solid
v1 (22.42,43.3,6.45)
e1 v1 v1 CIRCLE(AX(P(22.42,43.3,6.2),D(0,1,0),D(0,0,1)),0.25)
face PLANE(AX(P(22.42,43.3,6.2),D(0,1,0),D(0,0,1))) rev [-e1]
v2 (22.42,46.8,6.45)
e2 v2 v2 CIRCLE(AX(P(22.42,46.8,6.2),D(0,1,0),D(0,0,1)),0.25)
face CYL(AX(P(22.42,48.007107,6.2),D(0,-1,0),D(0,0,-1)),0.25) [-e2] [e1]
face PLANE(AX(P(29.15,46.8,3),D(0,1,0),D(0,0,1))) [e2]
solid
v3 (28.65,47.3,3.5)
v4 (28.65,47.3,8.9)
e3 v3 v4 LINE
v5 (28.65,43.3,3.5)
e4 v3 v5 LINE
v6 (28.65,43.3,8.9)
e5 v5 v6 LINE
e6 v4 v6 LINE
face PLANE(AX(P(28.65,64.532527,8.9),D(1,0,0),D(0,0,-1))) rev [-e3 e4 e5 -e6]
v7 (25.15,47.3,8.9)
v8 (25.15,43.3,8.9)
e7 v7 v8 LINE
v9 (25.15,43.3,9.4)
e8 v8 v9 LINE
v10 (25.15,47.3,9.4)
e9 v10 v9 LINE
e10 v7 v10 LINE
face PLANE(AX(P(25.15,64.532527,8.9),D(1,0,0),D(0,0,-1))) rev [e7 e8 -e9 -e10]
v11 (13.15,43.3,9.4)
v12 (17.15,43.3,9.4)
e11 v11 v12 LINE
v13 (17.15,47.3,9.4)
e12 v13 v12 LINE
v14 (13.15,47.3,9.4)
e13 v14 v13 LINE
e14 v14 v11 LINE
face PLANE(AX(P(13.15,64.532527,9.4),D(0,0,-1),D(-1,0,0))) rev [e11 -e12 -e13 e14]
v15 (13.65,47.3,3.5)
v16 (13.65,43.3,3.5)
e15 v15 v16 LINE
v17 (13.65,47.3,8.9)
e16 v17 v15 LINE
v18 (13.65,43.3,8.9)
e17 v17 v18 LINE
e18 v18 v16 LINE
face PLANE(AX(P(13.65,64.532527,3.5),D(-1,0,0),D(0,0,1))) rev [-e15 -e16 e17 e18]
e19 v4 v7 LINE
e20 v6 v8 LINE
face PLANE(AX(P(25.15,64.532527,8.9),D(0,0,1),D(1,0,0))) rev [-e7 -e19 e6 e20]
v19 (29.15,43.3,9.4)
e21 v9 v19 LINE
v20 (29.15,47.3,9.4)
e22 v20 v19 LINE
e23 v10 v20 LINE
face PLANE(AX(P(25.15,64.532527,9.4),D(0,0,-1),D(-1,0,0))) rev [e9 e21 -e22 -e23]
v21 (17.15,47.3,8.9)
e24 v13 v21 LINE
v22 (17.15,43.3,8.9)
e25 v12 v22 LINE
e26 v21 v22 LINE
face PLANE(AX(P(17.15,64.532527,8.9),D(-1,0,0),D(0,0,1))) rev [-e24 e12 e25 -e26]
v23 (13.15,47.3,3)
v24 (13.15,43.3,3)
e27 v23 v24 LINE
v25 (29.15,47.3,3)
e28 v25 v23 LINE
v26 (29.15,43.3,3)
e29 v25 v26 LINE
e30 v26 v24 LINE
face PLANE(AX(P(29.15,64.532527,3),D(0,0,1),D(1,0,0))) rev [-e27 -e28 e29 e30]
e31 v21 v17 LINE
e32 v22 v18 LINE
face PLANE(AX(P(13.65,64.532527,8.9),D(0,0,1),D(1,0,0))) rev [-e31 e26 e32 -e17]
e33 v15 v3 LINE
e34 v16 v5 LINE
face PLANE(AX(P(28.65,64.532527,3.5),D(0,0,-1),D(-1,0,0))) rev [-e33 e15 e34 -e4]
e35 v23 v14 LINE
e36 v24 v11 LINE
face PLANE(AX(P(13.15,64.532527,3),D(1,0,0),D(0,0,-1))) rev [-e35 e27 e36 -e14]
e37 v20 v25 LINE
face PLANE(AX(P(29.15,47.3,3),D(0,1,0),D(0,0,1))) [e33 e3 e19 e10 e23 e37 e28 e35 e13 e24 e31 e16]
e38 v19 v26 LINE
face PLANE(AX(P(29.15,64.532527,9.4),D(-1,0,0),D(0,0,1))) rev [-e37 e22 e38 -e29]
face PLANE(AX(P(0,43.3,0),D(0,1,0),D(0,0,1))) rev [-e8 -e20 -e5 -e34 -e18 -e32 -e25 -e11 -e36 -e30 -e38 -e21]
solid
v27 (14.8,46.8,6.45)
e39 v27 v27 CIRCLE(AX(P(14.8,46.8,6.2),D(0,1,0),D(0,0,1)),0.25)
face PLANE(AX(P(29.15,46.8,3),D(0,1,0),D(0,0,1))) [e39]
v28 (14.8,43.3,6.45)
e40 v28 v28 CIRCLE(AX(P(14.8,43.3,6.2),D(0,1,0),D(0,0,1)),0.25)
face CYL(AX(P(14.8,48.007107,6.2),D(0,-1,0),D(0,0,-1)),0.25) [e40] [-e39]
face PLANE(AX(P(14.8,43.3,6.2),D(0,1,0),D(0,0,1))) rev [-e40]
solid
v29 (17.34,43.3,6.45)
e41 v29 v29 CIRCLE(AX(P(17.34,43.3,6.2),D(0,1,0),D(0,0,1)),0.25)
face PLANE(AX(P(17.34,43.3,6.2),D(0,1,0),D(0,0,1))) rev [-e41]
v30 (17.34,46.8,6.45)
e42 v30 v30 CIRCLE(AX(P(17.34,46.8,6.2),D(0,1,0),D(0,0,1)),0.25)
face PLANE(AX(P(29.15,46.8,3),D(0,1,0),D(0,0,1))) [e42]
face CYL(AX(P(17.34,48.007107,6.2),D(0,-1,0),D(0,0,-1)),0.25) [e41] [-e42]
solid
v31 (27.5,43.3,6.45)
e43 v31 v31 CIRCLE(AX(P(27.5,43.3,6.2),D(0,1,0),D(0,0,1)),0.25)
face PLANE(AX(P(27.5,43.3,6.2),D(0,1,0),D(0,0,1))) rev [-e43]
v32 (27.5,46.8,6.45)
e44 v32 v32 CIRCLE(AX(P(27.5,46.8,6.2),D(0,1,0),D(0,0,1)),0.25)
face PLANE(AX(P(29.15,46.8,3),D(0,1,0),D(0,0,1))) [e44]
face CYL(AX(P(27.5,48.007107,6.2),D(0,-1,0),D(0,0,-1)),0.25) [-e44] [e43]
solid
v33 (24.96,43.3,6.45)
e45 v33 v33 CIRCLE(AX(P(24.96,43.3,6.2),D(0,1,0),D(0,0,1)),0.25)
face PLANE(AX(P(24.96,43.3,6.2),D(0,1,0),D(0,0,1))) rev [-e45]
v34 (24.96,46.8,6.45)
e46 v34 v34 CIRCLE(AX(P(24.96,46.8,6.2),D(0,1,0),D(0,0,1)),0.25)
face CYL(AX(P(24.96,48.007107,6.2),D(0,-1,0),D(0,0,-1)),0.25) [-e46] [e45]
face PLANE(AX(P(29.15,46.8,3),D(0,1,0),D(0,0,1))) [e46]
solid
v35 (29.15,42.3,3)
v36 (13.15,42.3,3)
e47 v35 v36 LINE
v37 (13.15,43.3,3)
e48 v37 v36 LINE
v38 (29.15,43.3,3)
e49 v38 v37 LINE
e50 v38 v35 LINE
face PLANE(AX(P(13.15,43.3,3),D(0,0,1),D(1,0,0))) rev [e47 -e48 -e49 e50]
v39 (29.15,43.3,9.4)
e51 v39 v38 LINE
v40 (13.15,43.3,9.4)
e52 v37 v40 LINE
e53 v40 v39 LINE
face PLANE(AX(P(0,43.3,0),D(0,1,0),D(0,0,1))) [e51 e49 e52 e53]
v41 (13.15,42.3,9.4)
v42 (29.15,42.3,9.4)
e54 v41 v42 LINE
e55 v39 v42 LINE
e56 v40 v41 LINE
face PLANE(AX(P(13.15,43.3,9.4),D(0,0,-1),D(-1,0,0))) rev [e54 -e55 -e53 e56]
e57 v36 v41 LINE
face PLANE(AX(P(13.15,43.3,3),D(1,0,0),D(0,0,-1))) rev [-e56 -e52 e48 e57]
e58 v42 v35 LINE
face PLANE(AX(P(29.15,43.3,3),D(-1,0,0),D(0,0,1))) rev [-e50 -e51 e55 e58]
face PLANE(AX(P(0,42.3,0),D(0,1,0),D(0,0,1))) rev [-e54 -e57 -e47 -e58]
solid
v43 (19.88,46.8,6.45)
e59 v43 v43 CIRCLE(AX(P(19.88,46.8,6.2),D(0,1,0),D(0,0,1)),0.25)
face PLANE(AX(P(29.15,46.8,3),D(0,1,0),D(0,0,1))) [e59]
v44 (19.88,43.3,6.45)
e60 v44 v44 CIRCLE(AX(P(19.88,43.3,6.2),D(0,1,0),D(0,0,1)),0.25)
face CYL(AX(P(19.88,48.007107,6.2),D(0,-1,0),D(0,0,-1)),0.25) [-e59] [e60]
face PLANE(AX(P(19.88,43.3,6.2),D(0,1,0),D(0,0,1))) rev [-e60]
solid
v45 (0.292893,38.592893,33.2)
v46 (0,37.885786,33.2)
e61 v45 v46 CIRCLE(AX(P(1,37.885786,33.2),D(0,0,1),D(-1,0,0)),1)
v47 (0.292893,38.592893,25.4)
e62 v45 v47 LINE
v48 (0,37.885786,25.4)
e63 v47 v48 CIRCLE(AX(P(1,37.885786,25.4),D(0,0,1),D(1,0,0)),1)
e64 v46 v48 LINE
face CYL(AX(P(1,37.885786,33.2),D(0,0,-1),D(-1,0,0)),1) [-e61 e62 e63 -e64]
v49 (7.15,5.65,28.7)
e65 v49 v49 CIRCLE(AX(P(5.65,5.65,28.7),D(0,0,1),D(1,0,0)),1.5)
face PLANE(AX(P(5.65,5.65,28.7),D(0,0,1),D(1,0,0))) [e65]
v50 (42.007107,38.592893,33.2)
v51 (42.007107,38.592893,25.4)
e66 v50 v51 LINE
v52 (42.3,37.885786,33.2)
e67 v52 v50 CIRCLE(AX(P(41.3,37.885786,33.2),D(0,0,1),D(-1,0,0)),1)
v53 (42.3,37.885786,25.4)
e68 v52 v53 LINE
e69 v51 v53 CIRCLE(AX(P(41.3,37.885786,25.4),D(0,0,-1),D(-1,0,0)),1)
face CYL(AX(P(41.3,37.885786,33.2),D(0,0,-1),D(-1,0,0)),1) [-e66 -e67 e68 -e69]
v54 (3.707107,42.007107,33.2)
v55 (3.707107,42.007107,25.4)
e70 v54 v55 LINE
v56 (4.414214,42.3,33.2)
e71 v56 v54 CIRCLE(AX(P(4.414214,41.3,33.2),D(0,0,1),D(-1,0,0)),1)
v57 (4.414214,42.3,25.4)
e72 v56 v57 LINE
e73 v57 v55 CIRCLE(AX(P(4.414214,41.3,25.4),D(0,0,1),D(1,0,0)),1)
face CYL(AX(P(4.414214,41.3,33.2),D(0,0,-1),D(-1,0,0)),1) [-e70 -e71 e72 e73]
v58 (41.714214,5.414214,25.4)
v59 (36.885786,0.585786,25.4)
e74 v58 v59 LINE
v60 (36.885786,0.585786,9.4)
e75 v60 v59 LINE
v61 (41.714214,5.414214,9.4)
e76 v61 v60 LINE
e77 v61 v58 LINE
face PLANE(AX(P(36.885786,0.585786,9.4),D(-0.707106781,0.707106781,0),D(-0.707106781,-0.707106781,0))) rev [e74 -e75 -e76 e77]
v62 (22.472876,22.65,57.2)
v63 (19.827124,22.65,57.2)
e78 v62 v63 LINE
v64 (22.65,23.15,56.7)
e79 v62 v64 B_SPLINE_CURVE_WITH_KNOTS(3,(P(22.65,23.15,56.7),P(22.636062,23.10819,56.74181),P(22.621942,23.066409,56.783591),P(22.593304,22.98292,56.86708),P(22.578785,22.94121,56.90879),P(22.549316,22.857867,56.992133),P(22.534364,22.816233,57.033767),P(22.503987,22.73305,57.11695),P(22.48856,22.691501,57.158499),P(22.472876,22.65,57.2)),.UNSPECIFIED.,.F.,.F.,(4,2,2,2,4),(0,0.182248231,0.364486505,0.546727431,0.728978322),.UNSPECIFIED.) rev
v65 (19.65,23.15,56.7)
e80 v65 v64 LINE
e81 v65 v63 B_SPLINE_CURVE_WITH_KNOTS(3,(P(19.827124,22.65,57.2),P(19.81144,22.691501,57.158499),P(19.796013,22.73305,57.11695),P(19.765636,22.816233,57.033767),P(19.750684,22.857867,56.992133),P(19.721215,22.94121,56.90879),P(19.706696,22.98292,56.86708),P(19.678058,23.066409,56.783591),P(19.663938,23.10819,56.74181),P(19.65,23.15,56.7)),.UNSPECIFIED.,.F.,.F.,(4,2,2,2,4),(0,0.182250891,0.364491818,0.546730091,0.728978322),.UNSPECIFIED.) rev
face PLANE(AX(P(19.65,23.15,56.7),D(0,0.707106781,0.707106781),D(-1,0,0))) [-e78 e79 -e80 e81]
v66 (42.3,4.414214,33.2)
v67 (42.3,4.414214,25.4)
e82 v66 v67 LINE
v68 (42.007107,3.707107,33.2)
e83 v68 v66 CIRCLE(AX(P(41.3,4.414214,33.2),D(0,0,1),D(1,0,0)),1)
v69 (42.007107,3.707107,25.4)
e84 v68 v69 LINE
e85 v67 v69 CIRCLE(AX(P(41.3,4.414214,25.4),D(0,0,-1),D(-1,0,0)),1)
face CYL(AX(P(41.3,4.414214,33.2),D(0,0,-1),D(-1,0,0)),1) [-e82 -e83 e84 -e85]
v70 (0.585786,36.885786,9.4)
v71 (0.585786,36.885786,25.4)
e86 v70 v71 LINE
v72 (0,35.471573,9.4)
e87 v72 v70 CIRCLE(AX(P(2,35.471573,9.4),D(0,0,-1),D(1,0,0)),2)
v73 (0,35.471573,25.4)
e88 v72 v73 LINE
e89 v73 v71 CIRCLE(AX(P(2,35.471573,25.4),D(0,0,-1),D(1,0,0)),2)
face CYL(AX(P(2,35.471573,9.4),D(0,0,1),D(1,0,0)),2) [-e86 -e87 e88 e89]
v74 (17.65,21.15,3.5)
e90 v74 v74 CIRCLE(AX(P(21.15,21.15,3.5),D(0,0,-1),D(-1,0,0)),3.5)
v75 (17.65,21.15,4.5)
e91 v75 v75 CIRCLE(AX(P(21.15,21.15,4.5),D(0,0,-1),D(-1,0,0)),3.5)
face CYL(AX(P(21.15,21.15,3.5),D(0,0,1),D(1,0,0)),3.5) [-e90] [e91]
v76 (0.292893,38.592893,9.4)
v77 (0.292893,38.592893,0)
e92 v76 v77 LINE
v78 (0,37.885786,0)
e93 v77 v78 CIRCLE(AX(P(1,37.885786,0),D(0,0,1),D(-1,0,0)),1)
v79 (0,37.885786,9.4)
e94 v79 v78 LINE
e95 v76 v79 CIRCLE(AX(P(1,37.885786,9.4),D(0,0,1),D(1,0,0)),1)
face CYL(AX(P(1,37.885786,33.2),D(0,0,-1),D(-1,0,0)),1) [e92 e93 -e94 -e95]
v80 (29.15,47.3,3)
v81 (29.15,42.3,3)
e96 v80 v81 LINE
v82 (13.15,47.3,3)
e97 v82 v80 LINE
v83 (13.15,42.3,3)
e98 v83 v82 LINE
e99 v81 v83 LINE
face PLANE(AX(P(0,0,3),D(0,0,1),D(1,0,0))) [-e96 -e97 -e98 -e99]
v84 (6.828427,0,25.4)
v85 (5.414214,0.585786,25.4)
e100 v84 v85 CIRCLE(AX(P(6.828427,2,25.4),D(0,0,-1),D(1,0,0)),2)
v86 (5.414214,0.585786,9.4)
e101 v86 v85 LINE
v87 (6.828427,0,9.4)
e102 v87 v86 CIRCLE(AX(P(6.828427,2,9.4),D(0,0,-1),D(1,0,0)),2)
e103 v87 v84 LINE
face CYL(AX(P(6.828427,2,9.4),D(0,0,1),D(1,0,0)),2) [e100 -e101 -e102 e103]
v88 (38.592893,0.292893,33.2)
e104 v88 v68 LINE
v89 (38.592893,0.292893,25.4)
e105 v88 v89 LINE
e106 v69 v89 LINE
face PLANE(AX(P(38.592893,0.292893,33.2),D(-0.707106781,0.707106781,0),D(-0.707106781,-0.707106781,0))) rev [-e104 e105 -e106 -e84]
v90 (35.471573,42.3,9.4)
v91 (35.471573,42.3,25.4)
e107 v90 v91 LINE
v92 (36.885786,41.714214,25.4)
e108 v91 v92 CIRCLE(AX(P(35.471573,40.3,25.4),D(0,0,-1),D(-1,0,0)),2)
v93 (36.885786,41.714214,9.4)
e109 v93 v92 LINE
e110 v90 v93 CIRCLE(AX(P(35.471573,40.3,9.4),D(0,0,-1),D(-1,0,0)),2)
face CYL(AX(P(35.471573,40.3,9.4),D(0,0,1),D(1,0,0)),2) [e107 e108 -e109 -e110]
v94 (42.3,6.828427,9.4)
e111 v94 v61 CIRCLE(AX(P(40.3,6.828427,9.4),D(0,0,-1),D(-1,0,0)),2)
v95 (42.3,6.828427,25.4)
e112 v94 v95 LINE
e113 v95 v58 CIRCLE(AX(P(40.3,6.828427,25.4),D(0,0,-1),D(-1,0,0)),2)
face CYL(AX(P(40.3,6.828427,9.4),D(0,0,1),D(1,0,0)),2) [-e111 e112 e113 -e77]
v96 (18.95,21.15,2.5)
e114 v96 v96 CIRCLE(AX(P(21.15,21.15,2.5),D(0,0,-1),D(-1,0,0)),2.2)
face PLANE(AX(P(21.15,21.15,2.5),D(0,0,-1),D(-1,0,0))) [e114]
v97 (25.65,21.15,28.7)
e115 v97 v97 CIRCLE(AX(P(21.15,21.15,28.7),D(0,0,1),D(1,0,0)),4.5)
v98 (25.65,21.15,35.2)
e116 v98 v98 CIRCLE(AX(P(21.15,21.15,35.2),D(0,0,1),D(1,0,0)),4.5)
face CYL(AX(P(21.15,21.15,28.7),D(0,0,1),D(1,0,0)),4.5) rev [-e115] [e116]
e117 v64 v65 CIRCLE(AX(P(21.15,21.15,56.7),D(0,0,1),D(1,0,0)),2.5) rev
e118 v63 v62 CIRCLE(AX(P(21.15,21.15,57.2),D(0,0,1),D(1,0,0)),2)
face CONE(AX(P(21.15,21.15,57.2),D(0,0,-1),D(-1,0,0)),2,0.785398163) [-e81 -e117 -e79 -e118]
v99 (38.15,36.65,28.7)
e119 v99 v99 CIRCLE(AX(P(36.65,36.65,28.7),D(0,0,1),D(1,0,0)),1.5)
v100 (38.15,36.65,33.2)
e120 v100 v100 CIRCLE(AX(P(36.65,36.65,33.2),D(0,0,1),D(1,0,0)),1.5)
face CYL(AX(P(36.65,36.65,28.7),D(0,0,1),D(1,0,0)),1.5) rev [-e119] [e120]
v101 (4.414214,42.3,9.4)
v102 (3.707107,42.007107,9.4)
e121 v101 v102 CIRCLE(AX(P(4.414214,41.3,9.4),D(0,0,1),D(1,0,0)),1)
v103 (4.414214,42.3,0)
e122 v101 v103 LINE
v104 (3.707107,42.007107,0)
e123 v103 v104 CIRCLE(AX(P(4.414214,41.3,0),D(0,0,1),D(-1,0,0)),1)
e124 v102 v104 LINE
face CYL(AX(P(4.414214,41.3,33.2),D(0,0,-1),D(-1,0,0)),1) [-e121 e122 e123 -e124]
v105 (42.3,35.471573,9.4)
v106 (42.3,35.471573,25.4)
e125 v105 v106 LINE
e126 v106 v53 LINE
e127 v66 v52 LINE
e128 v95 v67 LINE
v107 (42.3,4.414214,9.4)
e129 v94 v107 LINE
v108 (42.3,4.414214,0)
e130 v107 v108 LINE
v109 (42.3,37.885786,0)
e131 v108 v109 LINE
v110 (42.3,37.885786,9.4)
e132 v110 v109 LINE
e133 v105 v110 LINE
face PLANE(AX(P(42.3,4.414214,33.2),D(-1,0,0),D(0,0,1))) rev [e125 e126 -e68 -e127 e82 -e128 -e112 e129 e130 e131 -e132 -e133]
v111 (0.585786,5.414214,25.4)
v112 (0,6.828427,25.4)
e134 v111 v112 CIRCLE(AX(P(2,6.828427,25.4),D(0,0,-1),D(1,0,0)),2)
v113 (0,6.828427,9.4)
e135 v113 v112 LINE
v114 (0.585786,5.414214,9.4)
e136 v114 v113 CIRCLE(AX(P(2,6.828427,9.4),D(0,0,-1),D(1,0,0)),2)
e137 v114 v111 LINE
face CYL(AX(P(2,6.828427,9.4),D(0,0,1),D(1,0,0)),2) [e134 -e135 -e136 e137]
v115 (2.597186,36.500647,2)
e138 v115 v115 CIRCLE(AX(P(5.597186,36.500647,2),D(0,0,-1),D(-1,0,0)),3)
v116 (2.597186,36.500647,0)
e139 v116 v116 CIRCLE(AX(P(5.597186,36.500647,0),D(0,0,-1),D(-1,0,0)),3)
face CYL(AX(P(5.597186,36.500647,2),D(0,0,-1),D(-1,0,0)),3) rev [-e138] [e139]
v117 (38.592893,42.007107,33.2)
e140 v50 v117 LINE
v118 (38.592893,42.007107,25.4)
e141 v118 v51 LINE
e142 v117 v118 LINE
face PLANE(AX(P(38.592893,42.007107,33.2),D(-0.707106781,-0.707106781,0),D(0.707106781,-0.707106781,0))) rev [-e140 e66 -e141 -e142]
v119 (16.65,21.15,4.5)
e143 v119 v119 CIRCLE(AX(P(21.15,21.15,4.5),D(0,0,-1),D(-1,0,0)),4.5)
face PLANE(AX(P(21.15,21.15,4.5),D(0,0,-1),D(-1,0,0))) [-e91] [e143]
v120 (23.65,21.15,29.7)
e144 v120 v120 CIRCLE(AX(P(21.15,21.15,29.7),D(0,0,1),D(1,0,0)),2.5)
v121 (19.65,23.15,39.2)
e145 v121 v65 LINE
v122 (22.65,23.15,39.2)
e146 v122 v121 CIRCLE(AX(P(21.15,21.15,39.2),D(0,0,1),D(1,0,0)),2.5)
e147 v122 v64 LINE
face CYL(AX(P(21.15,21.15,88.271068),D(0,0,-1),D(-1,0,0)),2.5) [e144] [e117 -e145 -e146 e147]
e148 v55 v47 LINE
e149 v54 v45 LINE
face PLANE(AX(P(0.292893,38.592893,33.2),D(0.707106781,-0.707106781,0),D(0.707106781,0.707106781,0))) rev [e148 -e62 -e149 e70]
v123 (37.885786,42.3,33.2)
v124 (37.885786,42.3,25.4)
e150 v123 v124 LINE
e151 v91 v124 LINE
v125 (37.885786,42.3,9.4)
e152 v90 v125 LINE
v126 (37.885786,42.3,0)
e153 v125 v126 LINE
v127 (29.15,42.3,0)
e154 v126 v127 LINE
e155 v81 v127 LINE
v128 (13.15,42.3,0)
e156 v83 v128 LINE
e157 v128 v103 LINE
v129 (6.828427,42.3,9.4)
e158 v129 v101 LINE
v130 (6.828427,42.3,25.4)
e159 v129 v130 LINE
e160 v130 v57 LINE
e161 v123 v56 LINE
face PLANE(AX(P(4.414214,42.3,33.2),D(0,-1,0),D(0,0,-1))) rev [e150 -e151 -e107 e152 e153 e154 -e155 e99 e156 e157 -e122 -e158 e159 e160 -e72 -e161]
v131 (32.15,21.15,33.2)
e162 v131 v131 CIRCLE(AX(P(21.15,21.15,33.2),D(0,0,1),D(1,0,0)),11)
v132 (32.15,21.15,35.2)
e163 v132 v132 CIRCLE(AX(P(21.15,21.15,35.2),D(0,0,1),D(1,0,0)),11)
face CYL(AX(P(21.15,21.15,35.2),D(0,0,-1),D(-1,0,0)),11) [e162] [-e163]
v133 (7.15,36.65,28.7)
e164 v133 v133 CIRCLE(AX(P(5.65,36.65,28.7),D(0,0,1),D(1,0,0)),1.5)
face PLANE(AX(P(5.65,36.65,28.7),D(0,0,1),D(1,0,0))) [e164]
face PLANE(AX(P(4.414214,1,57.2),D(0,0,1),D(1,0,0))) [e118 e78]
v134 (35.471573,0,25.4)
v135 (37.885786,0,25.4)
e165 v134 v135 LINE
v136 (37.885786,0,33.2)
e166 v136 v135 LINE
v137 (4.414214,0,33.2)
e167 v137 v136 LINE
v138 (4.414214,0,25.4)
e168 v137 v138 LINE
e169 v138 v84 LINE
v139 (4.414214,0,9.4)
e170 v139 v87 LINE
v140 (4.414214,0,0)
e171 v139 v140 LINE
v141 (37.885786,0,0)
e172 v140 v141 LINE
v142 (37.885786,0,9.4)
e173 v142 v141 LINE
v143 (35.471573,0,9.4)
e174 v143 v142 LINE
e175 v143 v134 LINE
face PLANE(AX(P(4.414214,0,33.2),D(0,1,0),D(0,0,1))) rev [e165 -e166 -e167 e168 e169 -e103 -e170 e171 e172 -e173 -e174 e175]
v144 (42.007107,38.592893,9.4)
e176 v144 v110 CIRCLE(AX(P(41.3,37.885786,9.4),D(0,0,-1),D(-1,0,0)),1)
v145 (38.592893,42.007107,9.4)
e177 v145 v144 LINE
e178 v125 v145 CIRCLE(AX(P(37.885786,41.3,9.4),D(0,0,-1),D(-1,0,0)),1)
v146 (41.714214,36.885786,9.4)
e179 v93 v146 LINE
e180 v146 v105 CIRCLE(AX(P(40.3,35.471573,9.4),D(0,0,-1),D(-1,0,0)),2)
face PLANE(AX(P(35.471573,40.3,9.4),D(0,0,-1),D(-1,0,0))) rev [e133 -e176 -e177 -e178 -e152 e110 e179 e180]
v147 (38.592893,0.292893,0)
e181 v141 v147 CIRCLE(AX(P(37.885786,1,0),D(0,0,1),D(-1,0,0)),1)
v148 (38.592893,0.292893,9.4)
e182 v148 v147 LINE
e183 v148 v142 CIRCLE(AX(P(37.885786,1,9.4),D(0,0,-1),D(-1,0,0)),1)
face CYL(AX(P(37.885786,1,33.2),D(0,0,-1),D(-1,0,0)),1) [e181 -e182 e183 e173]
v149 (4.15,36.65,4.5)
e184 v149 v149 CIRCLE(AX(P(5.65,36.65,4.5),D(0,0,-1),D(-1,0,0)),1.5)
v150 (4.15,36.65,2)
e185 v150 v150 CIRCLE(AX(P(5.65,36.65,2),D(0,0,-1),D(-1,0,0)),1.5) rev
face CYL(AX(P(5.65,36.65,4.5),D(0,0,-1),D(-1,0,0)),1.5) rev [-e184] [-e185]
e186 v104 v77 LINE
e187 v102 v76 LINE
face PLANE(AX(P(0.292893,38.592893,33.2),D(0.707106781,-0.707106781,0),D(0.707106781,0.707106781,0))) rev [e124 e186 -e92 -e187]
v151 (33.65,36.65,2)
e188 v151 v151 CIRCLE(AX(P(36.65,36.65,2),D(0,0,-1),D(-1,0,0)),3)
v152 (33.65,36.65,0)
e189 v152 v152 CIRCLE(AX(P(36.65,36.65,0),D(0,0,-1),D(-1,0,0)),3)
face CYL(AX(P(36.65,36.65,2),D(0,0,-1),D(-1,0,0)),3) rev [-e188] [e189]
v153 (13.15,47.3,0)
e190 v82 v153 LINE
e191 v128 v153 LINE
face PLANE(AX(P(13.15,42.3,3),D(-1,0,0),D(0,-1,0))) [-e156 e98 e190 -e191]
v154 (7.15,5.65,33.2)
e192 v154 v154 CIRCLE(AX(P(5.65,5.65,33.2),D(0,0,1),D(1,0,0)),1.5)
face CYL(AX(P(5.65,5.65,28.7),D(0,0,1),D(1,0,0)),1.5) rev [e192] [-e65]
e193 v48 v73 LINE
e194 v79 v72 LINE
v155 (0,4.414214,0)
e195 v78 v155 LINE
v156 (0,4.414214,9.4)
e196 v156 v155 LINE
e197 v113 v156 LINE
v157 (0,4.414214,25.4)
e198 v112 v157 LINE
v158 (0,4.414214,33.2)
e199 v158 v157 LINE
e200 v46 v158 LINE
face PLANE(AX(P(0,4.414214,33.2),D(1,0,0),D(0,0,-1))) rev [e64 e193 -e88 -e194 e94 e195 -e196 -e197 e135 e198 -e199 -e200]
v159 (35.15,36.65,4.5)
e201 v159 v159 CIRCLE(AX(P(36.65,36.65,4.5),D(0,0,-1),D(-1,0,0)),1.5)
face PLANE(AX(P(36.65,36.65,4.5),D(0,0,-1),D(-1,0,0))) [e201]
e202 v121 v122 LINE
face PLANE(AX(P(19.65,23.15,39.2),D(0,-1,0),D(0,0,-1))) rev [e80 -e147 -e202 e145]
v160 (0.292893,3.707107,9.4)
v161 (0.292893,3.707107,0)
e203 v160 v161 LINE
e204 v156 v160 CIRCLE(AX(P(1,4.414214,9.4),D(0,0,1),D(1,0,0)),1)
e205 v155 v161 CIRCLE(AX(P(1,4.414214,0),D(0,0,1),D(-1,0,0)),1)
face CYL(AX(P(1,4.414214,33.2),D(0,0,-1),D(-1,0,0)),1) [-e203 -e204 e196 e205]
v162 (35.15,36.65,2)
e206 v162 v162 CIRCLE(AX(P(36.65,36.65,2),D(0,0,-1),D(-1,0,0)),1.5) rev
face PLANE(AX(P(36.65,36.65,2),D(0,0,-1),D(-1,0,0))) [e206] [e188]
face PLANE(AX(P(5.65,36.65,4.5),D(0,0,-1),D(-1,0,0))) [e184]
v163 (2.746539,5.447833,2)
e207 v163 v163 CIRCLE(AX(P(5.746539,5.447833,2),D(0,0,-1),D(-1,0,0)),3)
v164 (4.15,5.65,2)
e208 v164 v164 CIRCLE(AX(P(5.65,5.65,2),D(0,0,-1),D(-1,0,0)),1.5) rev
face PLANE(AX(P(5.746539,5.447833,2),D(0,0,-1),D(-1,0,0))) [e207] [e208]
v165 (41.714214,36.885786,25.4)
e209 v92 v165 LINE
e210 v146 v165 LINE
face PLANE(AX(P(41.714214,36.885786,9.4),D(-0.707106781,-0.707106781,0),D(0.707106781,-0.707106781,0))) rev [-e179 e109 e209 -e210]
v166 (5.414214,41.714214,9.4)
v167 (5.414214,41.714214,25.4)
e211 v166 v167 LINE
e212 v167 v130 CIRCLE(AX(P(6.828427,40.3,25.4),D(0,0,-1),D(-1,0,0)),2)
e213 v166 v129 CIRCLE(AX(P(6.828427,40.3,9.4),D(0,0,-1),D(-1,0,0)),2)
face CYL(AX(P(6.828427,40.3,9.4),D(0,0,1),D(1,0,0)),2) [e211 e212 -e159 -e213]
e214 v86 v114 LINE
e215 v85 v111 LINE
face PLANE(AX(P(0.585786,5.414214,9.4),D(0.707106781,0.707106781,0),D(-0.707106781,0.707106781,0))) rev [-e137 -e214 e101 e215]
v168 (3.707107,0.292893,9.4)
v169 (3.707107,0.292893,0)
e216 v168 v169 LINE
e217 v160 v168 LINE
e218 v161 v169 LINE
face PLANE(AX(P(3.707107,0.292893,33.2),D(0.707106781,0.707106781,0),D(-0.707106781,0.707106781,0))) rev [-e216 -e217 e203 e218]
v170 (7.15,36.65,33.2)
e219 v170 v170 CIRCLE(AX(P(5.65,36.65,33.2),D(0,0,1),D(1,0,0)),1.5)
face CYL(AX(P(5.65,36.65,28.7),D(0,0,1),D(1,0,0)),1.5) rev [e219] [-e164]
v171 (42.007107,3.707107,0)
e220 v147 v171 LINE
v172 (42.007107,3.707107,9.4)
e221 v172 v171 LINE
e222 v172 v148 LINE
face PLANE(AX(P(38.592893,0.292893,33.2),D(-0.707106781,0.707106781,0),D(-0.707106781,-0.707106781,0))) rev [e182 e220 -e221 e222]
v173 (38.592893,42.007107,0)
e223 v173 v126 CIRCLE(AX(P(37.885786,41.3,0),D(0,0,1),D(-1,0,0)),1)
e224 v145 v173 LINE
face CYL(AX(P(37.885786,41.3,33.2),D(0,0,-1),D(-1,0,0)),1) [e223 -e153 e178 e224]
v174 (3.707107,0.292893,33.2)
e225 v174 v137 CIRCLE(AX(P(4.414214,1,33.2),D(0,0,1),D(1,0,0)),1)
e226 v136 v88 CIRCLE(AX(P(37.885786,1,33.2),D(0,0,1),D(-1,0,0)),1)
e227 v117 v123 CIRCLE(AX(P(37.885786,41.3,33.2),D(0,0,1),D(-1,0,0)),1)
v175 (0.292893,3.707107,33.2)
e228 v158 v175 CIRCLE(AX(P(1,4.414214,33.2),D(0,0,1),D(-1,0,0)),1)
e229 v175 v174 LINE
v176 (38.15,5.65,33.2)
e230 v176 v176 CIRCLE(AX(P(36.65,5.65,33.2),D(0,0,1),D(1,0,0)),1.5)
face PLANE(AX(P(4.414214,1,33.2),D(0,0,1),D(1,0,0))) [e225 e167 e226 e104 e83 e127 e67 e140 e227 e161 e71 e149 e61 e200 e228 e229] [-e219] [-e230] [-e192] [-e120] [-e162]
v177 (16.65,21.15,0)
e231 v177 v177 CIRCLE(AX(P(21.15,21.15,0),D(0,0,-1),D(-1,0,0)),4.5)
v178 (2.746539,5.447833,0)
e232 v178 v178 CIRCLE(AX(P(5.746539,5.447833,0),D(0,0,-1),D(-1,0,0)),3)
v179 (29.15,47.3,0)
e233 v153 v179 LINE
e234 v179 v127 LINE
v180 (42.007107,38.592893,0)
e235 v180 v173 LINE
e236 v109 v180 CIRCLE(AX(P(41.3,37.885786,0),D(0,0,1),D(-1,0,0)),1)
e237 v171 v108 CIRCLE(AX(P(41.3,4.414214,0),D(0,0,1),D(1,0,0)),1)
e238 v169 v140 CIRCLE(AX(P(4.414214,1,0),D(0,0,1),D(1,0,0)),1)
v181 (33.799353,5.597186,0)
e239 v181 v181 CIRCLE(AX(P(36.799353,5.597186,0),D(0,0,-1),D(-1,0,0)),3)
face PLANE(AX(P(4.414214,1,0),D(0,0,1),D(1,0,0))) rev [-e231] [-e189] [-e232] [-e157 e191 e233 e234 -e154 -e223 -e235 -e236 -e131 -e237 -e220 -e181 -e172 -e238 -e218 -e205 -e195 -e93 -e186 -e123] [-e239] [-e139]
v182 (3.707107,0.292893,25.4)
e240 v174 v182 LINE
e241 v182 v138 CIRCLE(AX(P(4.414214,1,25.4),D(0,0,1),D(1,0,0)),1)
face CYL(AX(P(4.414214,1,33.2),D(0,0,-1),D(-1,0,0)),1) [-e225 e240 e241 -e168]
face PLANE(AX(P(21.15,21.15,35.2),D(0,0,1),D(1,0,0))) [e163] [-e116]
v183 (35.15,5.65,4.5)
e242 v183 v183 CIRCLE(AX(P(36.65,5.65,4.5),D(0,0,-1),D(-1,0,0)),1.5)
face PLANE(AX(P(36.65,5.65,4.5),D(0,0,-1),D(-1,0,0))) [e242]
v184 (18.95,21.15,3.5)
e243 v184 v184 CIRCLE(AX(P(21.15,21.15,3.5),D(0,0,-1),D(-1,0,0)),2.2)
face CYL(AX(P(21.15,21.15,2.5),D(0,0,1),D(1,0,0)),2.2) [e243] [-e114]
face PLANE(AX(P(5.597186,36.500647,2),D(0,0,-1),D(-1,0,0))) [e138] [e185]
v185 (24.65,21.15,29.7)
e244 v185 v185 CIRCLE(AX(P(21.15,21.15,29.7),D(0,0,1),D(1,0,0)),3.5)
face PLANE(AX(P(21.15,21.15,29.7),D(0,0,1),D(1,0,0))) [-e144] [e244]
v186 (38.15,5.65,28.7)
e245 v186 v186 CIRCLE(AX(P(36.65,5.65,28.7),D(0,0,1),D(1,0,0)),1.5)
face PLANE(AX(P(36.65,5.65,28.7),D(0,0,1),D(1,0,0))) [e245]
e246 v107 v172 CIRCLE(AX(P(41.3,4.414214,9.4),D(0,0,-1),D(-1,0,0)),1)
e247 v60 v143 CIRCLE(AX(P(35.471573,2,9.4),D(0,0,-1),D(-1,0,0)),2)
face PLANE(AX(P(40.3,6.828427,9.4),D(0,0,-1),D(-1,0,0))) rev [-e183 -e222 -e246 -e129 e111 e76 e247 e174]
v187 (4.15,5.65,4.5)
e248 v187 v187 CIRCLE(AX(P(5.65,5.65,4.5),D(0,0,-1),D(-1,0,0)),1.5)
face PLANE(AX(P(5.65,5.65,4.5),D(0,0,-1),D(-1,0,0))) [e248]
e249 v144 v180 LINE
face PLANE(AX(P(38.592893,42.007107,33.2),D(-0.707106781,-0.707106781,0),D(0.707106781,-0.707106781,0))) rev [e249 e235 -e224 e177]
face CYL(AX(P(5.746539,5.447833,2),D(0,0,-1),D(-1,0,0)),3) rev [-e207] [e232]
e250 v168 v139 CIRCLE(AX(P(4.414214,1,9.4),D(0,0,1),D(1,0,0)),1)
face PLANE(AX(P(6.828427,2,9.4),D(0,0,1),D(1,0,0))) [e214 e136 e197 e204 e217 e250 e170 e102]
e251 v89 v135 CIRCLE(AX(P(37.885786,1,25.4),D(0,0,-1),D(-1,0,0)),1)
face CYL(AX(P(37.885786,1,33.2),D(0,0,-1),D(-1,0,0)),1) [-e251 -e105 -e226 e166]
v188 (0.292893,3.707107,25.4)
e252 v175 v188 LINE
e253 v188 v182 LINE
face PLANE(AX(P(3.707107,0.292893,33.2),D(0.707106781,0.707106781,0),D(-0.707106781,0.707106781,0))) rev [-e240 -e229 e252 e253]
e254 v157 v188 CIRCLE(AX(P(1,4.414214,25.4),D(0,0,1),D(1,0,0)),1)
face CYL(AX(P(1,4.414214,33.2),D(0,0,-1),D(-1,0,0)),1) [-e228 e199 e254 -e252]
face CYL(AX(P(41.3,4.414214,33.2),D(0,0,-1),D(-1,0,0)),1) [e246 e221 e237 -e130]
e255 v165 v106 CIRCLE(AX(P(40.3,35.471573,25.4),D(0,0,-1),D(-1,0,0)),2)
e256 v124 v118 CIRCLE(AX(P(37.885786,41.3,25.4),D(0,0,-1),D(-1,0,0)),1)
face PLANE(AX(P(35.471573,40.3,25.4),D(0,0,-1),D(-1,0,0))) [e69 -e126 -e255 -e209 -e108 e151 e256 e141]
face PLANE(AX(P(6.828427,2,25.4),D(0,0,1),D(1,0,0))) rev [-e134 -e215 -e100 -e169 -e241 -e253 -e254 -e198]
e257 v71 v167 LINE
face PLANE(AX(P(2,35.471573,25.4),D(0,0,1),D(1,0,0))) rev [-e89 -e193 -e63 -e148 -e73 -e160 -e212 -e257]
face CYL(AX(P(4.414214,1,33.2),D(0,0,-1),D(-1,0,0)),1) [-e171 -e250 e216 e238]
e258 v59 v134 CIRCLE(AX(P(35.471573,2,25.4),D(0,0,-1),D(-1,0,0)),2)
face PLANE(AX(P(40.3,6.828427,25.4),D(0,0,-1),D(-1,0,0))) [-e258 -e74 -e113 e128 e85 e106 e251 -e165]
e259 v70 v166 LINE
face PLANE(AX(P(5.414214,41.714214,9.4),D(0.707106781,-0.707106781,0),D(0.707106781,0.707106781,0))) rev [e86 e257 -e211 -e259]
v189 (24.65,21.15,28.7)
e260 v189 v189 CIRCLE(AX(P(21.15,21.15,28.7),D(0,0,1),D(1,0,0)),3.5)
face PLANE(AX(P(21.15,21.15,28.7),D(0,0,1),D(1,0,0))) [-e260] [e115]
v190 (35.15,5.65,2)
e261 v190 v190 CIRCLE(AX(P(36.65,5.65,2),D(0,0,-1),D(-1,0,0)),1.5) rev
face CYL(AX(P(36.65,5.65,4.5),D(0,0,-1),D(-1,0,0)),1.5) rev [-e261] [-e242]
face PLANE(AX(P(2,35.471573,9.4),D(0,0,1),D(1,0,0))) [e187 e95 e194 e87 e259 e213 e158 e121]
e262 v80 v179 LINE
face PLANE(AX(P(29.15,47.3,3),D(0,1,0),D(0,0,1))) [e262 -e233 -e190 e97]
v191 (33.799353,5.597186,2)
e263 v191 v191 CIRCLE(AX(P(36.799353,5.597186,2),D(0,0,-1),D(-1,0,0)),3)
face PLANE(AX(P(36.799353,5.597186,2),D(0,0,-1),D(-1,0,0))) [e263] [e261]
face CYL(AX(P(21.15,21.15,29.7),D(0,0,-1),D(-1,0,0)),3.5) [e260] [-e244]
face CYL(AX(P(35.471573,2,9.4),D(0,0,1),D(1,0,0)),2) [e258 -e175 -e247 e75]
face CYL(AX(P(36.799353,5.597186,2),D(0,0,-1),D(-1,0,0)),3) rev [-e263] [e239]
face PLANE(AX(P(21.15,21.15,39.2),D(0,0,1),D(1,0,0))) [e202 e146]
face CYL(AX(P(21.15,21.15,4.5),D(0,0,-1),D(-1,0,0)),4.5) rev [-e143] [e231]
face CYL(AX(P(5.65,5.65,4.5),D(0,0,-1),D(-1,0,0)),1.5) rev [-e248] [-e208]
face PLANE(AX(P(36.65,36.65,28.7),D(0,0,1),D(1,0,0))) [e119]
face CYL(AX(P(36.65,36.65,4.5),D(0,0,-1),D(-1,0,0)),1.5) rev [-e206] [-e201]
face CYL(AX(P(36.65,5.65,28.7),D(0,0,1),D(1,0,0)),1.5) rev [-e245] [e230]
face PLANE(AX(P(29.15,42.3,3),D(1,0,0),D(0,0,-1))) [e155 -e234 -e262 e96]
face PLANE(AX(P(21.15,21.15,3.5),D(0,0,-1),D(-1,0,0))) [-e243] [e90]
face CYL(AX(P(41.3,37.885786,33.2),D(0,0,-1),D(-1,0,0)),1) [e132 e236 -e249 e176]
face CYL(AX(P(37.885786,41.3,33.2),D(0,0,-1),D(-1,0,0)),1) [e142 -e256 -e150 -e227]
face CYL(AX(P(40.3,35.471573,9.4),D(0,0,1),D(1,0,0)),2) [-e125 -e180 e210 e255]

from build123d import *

# Parameters (mm, degrees)
EXTRUDE_1_DEPTH     = 33.2
CUT_EXTRUDE_1_DEPTH = 16
SKETCH_4_W          = 16
SKETCH_4_H          = 5
EXTRUDE_2_DEPTH     = 3
SKETCH_5_R          = 1.5
SKETCH_5_R_2        = 4.5
CUT_EXTRUDE_2_DEPTH = 4.5
SKETCH_6_R          = 2.2
EXTRUDE_3_DEPTH     = 2
SKETCH_7_R          = 3
CUT_EXTRUDE_3_DEPTH = 2
CUT_EXTRUDE_START   = -4.5
SKETCH_8_R          = 1.5
SKETCH_8_R_2        = 4.5
CUT_EXTRUDE_4_DEPTH = 4.5
SKETCH_9_R          = 2.5
EXTRUDE_4_DEPTH     = 28.5
CUT_EXTRUDE_START_2 = -18
CUT_EXTRUDE_5_DEPTH = 18
CHAMFER_1_SIZE      = 0.5
SKETCH_11_R         = 11
SKETCH_11_R_2       = 4.5
EXTRUDE_5_DEPTH     = 2
SKETCH_12_R         = 3.5
EXTRUDE_6_DEPTH     = 1
EXTRUDE_START       = 1
SKETCH_13_R         = 3.5
EXTRUDE_7_DEPTH     = 1
SKETCH_14_W         = 16
SKETCH_14_H         = 6.4
EXTRUDE_8_DEPTH     = 1
SKETCH_15_R         = 0.25
EXTRUDE_9_DEPTH     = 3.5
EXTRUDE_9_2_DEPTH   = 3.5
EXTRUDE_9_3_DEPTH   = 3.5
EXTRUDE_9_4_DEPTH   = 3.5
EXTRUDE_9_5_DEPTH   = 3.5
EXTRUDE_9_6_DEPTH   = 3.5
EXTRUDE_10_DEPTH    = 4


with BuildPart() as part:
    # 草图1 → 凸台-拉伸1 (new body)
    with BuildSketch(Plane.XY):
        with BuildLine():
            Line((0.292893219, 38.592893219), (3.707106781, 42.007106781))
            ThreePointArc((3.707106781, 42.007106781), (4.03153013, 42.223879533), (4.414213562, 42.3))
            Line((4.414213562, 42.3), (37.885786438, 42.3))
            ThreePointArc((37.885786438, 42.3), (38.26846987, 42.223879533), (38.592893219, 42.007106781))
            Line((38.592893219, 42.007106781), (42.007106781, 38.592893219))
            ThreePointArc((42.007106781, 38.592893219), (42.223879533, 38.26846987), (42.3, 37.885786438))
            Line((42.3, 37.885786438), (42.3, 4.414213562))
            ThreePointArc((42.3, 4.414213562), (42.223879533, 4.03153013), (42.007106781, 3.707106781))
            Line((42.007106781, 3.707106781), (38.592893219, 0.292893219))
            ThreePointArc((38.592893219, 0.292893219), (38.26846987, 0.076120467), (37.885786438, 0))
            Line((37.885786438, 0), (4.414213562, 0))
            ThreePointArc((4.414213562, 0), (4.03153013, 0.076120467), (3.707106781, 0.292893219))
            Line((3.707106781, 0.292893219), (0.292893219, 3.707106781))
            ThreePointArc((0.292893219, 3.707106781), (0.076120467, 4.03153013), (0, 4.414213562))
            Line((0, 4.414213562), (0, 37.885786438))
            ThreePointArc((0, 37.885786438), (0.076120467, 38.26846987), (0.292893219, 38.592893219))
        make_face()
    extrude(amount=EXTRUDE_1_DEPTH)

    # 草图3 → 切除-拉伸1 (cut)
    with BuildSketch(Plane.XY.offset(25.4)):
        with BuildLine():
            Line((5.414213562, 41.714213562), (0.585786438, 36.885786438))
            ThreePointArc((0.585786438, 36.885786438), (0.152240935, 36.23693974), (0, 35.471572875))
            Line((0, 35.471572875), (0, 42.3))
            Line((0, 42.3), (6.828427125, 42.3))
            ThreePointArc((6.828427125, 42.3), (6.06306026, 42.147759065), (5.414213562, 41.714213562))
        make_face()
        with BuildLine():
            Line((0.585786438, 5.414213562), (5.414213562, 0.585786438))
            ThreePointArc((5.414213562, 0.585786438), (6.06306026, 0.152240935), (6.828427125, 0))
            Line((6.828427125, 0), (0, 0))
            Line((0, 0), (0, 6.828427125))
            ThreePointArc((0, 6.828427125), (0.152240935, 6.06306026), (0.585786438, 5.414213562))
        make_face()
        with BuildLine():
            Line((36.885786438, 0.585786438), (41.714213562, 5.414213562))
            ThreePointArc((41.714213562, 5.414213562), (42.147759065, 6.06306026), (42.3, 6.828427125))
            Line((42.3, 6.828427125), (42.3, 0))
            Line((42.3, 0), (35.471572875, 0))
            ThreePointArc((35.471572875, 0), (36.23693974, 0.152240935), (36.885786438, 0.585786438))
        make_face()
        with BuildLine():
            Line((41.714213562, 36.885786438), (36.885786438, 41.714213562))
            ThreePointArc((36.885786438, 41.714213562), (36.23693974, 42.147759065), (35.471572875, 42.3))
            Line((35.471572875, 42.3), (42.3, 42.3))
            Line((42.3, 42.3), (42.3, 35.471572875))
            ThreePointArc((42.3, 35.471572875), (42.147759065, 36.23693974), (41.714213562, 36.885786438))
        make_face()
    extrude(amount=-CUT_EXTRUDE_1_DEPTH, mode=Mode.SUBTRACT)

    # 草图4 → 凸台-拉伸2 (add)
    with BuildSketch(Plane(origin=(0, 0, 0), x_dir=(-1, 0, 0), z_dir=(0, 0, -1))):
        with Locations((-21.15, 44.8)):
            Rectangle(SKETCH_4_W, SKETCH_4_H)
    extrude(amount=-EXTRUDE_2_DEPTH)

    # 草图5 → 切除-拉伸2 (cut)
    with BuildSketch(Plane(origin=(0, 0, 0), x_dir=(-1, 0, 0), z_dir=(0, 0, -1))):
        with Locations((-36.65, 36.65)):
            Circle(SKETCH_5_R)
        with Locations((-5.65, 36.65)):
            Circle(SKETCH_5_R)
        with Locations((-5.65, 5.65)):
            Circle(SKETCH_5_R)
        with Locations((-36.65, 5.65)):
            Circle(SKETCH_5_R)
        with Locations((-21.15, 21.15)):
            Circle(SKETCH_5_R_2)
    extrude(amount=-CUT_EXTRUDE_2_DEPTH, mode=Mode.SUBTRACT)

    # 草图6 → 凸台-拉伸3 (add)
    with BuildSketch(Plane(origin=(0, 0, 4.5), x_dir=(-1, 0, 0), z_dir=(0, 0, -1))):
        with Locations((-21.15, 21.15)):
            Circle(SKETCH_6_R)
    extrude(amount=EXTRUDE_3_DEPTH)

    # 草图7 → 切除-拉伸3 (cut)
    with BuildSketch(Plane(origin=(0, 0, 0), x_dir=(-1, 0, 0), z_dir=(0, 0, -1))):
        with Locations((-36.65, 36.65)):
            Circle(SKETCH_7_R)
        with Locations((-5.597185915, 36.500646673)):
            Circle(SKETCH_7_R)
        with Locations((-5.746539242, 5.447832589)):
            Circle(SKETCH_7_R)
        with Locations((-36.799353327, 5.597185915)):
            Circle(SKETCH_7_R)
    extrude(amount=-CUT_EXTRUDE_3_DEPTH, mode=Mode.SUBTRACT)

    # 草图8 → 切除-拉伸4 (cut)
    with BuildSketch(Plane.XY.offset(33.2).offset(CUT_EXTRUDE_START)):
        with Locations(Location((5.65, 5.65, 0), (0, 0, 180))):
            Circle(SKETCH_8_R)
        with Locations(Location((36.65, 5.65, 0), (0, 0, 180))):
            Circle(SKETCH_8_R)
        with Locations(Location((36.65, 36.65, 0), (0, 0, 180))):
            Circle(SKETCH_8_R)
        with Locations(Location((5.65, 36.65, 0), (0, 0, 180))):
            Circle(SKETCH_8_R)
        with Locations(Location((21.15, 21.15, 0), (0, 0, 180))):
            Circle(SKETCH_8_R_2)
    extrude(amount=CUT_EXTRUDE_4_DEPTH, mode=Mode.SUBTRACT)

    # 草图9 → 凸台-拉伸4 (add)
    with BuildSketch(Plane.XY.offset(28.7)):
        with Locations(Location((21.15, 21.15, 0), (0, 0, 180))):
            Circle(SKETCH_9_R)
    extrude(amount=EXTRUDE_4_DEPTH)

    # 草图10 → 切除-拉伸5 (cut)
    with BuildSketch(Plane.XY.offset(57.2).offset(CUT_EXTRUDE_START_2)):
        with BuildLine():
            Line((19.65, 23.15), (22.65, 23.15))
            ThreePointArc((22.65, 23.15), (21.15, 23.65), (19.65, 23.15))
        make_face()
    extrude(amount=CUT_EXTRUDE_5_DEPTH, mode=Mode.SUBTRACT)

    # 倒角1
    chamfer_1_edges = [part.edges().sort_by_distance(p)[0] for p in [
        (22.268033989, 18.913932023, 57.2),
        (21.15, 23.15, 57.2),
    ]]
    chamfer(chamfer_1_edges, length=CHAMFER_1_SIZE - 0.0001)  # a hair under: the kernel refuses the full size

    # 草图11 → 凸台-拉伸5 (add)
    with BuildSketch(Plane.XY.offset(33.2)):
        with Locations((21.15, 21.15)):
            Circle(SKETCH_11_R)
        with Locations(Location((21.15, 21.15, 0), (0, 0, 180))):
            Circle(SKETCH_11_R_2, mode=Mode.SUBTRACT)
    extrude(amount=EXTRUDE_5_DEPTH)

    # 草图12 → 凸台-拉伸6 (add)
    with BuildSketch(Plane(origin=(0, 0, 4.5), x_dir=(-1, 0, 0), z_dir=(0, 0, -1))):
        with Locations((-21.15, 21.15)):
            Circle(SKETCH_12_R)
    extrude(amount=EXTRUDE_6_DEPTH)

    # 草图13 → 凸台-拉伸7 (add)
    with BuildSketch(Plane.XY.offset(28.7).offset(EXTRUDE_START)):
        with Locations(Location((21.15, 21.15, 0), (0, 0, 180))):
            Circle(SKETCH_13_R)
    extrude(amount=-EXTRUDE_7_DEPTH)


with BuildPart() as body_2:
    # 草图14 → 凸台-拉伸8 (new body)
    with BuildSketch(Plane(origin=(0, 42.3, 0), x_dir=(1, 0, 0), z_dir=(0, 1, 0))):
        with Locations((21.15, -6.2)):
            Rectangle(SKETCH_14_W, SKETCH_14_H)
    extrude(amount=EXTRUDE_8_DEPTH)


with BuildPart() as body_3:
    # 草图15 → 凸台-拉伸9 (new body)
    with BuildSketch(Plane(origin=(0, 43.3, 0), x_dir=(1, 0, 0), z_dir=(0, 1, 0))):
        with Locations(Location((14.8, -6.2, 0), (0, 0, 270))):
            Circle(SKETCH_15_R)
    extrude(amount=EXTRUDE_9_DEPTH)


with BuildPart() as body_4:
    # 草图15 → Extrude 9 2 (new body)
    with BuildSketch(Plane(origin=(0, 43.3, 0), x_dir=(1, 0, 0), z_dir=(0, 1, 0))):
        with Locations(Location((17.34, -6.2, 0), (0, 0, 270))):
            Circle(SKETCH_15_R)
    extrude(amount=EXTRUDE_9_2_DEPTH)


with BuildPart() as body_5:
    # 草图15 → Extrude 9 3 (new body)
    with BuildSketch(Plane(origin=(0, 43.3, 0), x_dir=(1, 0, 0), z_dir=(0, 1, 0))):
        with Locations(Location((19.88, -6.2, 0), (0, 0, 270))):
            Circle(SKETCH_15_R)
    extrude(amount=EXTRUDE_9_3_DEPTH)


with BuildPart() as body_6:
    # 草图15 → Extrude 9 4 (new body)
    with BuildSketch(Plane(origin=(0, 43.3, 0), x_dir=(1, 0, 0), z_dir=(0, 1, 0))):
        with Locations(Location((22.42, -6.2, 0), (0, 0, 270))):
            Circle(SKETCH_15_R)
    extrude(amount=EXTRUDE_9_4_DEPTH)


with BuildPart() as body_7:
    # 草图15 → Extrude 9 5 (new body)
    with BuildSketch(Plane(origin=(0, 43.3, 0), x_dir=(1, 0, 0), z_dir=(0, 1, 0))):
        with Locations(Location((24.96, -6.2, 0), (0, 0, 270))):
            Circle(SKETCH_15_R)
    extrude(amount=EXTRUDE_9_5_DEPTH)


with BuildPart() as body_8:
    # 草图15 → Extrude 9 6 (new body)
    with BuildSketch(Plane(origin=(0, 43.3, 0), x_dir=(1, 0, 0), z_dir=(0, 1, 0))):
        with Locations(Location((27.5, -6.2, 0), (0, 0, 270))):
            Circle(SKETCH_15_R)
    extrude(amount=EXTRUDE_9_6_DEPTH)


with BuildPart() as body_9:
    # 草图16 → 凸台-拉伸10 (new body)
    with BuildSketch(Plane(origin=(0, 43.3, 0), x_dir=(1, 0, 0), z_dir=(0, 1, 0))):
        Polygon((17.15, -8.9), (17.15, -9.4), (13.15, -9.4), (13.15, -3), (29.15, -3), (29.15, -9.4), (25.15, -9.4), (25.15, -8.9), (28.65, -8.9), (28.65, -3.5), (13.65, -3.5), (13.65, -8.9), align=None)
    extrude(amount=EXTRUDE_10_DEPTH)


solid = Compound([part.part, body_2.part, body_3.part, body_4.part, body_5.part, body_6.part, body_7.part, body_8.part, body_9.part])
